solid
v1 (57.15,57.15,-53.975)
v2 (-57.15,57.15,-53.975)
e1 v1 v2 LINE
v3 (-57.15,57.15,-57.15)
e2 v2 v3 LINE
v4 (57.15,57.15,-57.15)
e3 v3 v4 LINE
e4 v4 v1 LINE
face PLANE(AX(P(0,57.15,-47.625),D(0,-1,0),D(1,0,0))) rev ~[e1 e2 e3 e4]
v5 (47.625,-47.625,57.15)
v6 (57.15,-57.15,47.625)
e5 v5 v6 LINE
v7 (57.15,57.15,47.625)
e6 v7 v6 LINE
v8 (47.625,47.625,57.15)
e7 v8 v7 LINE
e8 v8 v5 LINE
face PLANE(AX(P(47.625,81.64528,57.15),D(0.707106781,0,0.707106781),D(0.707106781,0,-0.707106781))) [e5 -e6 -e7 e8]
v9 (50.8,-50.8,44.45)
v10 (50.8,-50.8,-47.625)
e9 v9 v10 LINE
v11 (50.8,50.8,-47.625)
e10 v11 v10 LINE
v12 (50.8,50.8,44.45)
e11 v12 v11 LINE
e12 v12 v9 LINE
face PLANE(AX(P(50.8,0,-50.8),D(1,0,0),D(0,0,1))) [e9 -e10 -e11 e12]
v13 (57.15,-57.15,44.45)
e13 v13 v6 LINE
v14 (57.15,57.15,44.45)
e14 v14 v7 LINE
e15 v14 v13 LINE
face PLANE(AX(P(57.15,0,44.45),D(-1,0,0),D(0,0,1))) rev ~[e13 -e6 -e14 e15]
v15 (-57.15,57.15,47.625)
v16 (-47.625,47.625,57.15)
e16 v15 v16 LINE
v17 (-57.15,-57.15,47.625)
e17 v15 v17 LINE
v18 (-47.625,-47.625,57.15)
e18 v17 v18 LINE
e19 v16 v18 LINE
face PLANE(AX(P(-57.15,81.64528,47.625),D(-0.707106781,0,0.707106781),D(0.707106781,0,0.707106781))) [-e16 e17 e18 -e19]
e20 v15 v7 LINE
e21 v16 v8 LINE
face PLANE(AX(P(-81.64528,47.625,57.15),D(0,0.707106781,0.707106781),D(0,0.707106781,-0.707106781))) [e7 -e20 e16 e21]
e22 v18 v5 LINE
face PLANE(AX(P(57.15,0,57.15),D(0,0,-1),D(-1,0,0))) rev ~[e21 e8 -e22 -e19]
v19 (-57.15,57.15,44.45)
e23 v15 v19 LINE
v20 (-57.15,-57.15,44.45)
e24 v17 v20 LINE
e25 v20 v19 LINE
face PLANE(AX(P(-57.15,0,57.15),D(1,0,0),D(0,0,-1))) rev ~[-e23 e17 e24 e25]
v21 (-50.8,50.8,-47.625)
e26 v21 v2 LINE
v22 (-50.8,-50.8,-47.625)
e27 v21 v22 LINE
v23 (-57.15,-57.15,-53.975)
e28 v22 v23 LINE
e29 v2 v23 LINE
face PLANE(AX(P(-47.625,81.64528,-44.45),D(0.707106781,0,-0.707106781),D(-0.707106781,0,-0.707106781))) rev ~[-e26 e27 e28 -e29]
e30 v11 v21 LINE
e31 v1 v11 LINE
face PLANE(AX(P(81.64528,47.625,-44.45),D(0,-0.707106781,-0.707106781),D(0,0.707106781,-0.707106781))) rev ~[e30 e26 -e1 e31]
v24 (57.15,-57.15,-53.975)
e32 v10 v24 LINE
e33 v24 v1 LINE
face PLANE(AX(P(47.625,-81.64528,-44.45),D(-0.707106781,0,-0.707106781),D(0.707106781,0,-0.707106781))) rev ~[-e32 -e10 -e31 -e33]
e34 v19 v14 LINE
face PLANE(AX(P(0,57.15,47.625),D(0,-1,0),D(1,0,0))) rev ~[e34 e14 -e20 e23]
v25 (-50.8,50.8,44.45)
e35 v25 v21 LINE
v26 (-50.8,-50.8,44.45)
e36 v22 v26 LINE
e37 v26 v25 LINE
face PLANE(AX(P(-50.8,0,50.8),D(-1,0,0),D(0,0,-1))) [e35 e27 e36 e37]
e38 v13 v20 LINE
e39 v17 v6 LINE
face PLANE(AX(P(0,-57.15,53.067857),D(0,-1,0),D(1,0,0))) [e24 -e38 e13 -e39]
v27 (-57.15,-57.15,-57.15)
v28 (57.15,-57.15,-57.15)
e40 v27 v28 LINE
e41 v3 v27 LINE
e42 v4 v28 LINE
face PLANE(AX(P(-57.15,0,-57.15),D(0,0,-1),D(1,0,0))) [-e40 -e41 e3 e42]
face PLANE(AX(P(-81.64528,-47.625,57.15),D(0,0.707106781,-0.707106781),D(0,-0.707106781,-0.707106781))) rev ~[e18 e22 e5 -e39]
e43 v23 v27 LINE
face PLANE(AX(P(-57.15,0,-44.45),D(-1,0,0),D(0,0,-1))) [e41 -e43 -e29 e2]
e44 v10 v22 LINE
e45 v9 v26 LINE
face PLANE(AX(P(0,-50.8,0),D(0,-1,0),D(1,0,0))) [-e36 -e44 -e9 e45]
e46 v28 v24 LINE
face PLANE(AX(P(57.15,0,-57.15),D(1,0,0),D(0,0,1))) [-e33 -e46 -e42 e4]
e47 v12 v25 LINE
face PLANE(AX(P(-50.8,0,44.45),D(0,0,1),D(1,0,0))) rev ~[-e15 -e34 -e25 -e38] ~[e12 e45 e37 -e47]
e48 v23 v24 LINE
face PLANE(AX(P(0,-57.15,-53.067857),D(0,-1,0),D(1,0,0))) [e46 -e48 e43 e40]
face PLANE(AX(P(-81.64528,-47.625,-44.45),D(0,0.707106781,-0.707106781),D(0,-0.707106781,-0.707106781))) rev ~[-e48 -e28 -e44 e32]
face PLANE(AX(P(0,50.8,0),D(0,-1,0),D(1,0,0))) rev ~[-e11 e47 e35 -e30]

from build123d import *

# Parameters (mm, degrees)
F0_W          = 101.6
F0_H          = 6.35
F0_H_2        = 88.9
F1_DEPTH      = 50.8
F2_DEPTH      = 57.15
F3_DEPTH      = 57.15
F4_T1_DEPTH   = 163.2905609208
F4_T3_DEPTH   = 163.2905609208
F4_T8_DEPTH   = 163.2905609208
F4_T14_DEPTH  = 163.2905609208
F4_T20_DEPTH  = 163.2905609208
F4_T27_DEPTH  = 163.2905609208
F4_T33_DEPTH  = 163.2905609208
F4_T39_DEPTH  = 163.2905609208
F4_T45_DEPTH  = 163.2905609208
F4_T51_DEPTH  = 163.2905609208
F4_T58_DEPTH  = 163.2905609208
F4_T64_DEPTH  = 163.2905609208
F4_T70_DEPTH  = 163.2905609208
F4_T76_DEPTH  = 163.2905609208
F4_T82_DEPTH  = 163.2905609208
F4_T89_DEPTH  = 163.2905609208
F4_T95_DEPTH  = 163.2905609208
F4_T101_DEPTH = 163.2905609208
F4_T107_DEPTH = 163.2905609208
F4_T113_DEPTH = 163.2905609208
F4_T120_DEPTH = 163.2905609208
F4_T126_DEPTH = 163.2905609208


# Not quite as in the source:
# - a fillet or chamfer that OpenCascade refuses, or shapes differently, is made with other operations: its cross-section is extruded or revolved along the edge and cut away or added


with BuildPart() as f1:
    # F0 (on Front) → F1 (new body, symmetric)
    with BuildSketch(Plane.XZ):
        with Locations((0, -47.625)):
            Rectangle(F0_W, F0_H)
        Rectangle(F0_W, F0_H_2)
        with Locations((0, 47.625)):
            Rectangle(F0_W, F0_H)
    extrude(amount=F1_DEPTH, both=True)

    # F0 (on Front) → F2 (join, symmetric)
    with BuildSketch(Plane.XZ):
        Polygon((-50.8, 44.45), (-50.8, 50.8), (50.8, 50.8), (50.8, 44.45), (57.15, 44.45), (57.15, 57.15), (-57.15, 57.15), (-57.15, 44.45), align=None)
        Polygon((-50.8, -50.8), (-50.8, -44.45), (-57.15, -44.45), (-57.15, -57.15), (57.15, -57.15), (57.15, -44.45), (50.8, -44.45), (50.8, -50.8), align=None)
    extrude(amount=F2_DEPTH, both=True)

    # F0 (on Front) → F3 (join, symmetric)
    with BuildSketch(Plane.XZ):
        with Locations((0, 47.625)):
            Rectangle(F0_W, F0_H)
        with Locations((0, -47.625)):
            Rectangle(F0_W, F0_H)
    extrude(amount=F3_DEPTH, both=True)

    # F4: chamfer of 9.525 on 8 edges, made by hand

    # F4_s2 → F4_t1 (cut)
    with BuildSketch(Plane.YZ.offset(-81.6452804604)):
        Polygon((-47.625, 57.15), (-57.15, 47.625), (-57.15, 57.15), align=None)
        Polygon((47.625, 57.15), (57.15, 47.625), (57.15, 57.15), align=None)
    extrude(amount=F4_T1_DEPTH, mode=Mode.SUBTRACT)

    # F4_s4 → F4_t3 (cut)
    with BuildSketch(Plane.XZ.offset(-81.6452804604)):
        Polygon((47.625, 57.15), (57.15, 47.625), (57.15, 57.15), align=None)
        Polygon((-57.15, 47.625), (-47.625, 57.15), (-57.15, 57.15), align=None)
    extrude(amount=F4_T3_DEPTH, mode=Mode.SUBTRACT)


with BuildPart() as f4_tool6:
    # F4_s7 → F4_t8 (new body)
    with BuildSketch(Plane.XZ.offset(81.6452804604)):
        Polygon((47.625, -44.45), (57.15, -53.975), (57.15, -44.45), align=None)
    extrude(amount=-F4_T8_DEPTH)

    split(bisect_by=Plane.YZ.offset(50.8), keep=Keep.BOTTOM)

    split(bisect_by=Plane.XZ.offset(50.8), keep=Keep.TOP)


with BuildPart() as f1_1:
    add(f1.part)

    # F4_t5: cut F4_tool6
    add(f4_tool6.part, mode=Mode.SUBTRACT)


with BuildPart() as f4_tool12:
    # F4_s13 → F4_t14 (new body)
    with BuildSketch(Plane.XZ.offset(81.6452804604)):
        Polygon((47.625, -44.45), (57.15, -53.975), (57.15, -44.45), align=None)
    extrude(amount=-F4_T14_DEPTH)

    split(bisect_by=Plane.YZ.offset(50.8), keep=Keep.TOP)

    split(bisect_by=Plane.XZ.offset(50.8), keep=Keep.TOP)


with BuildPart() as f1_2:
    add(f1_1.part)

    # F4_t11: cut F4_tool12
    add(f4_tool12.part, mode=Mode.SUBTRACT)


with BuildPart() as f4_tool18:
    # F4_s19 → F4_t20 (new body)
    with BuildSketch(Plane.XZ.offset(81.6452804604)):
        Polygon((47.625, -44.45), (57.15, -53.975), (57.15, -44.45), align=None)
    extrude(amount=-F4_T20_DEPTH)

    split(bisect_by=Plane.XZ.offset(-50.8), keep=Keep.TOP)

    split(bisect_by=Plane.YZ.offset(50.8), keep=Keep.TOP)

    split(bisect_by=Plane.XZ.offset(50.8), keep=Keep.BOTTOM)


with BuildPart() as f1_3:
    add(f1_2.part)

    # F4_t17: cut F4_tool18
    add(f4_tool18.part, mode=Mode.SUBTRACT)


with BuildPart() as f4_tool25:
    # F4_s26 → F4_t27 (new body)
    with BuildSketch(Plane.XZ.offset(81.6452804604)):
        Polygon((47.625, -44.45), (57.15, -53.975), (57.15, -44.45), align=None)
    extrude(amount=-F4_T27_DEPTH)

    split(bisect_by=Plane.XZ.offset(-50.8), keep=Keep.BOTTOM)

    split(bisect_by=Plane.YZ.offset(50.8), keep=Keep.BOTTOM)


with BuildPart() as f1_4:
    add(f1_3.part)

    # F4_t24: cut F4_tool25
    add(f4_tool25.part, mode=Mode.SUBTRACT)


with BuildPart() as f4_tool31:
    # F4_s32 → F4_t33 (new body)
    with BuildSketch(Plane.XZ.offset(81.6452804604)):
        Polygon((47.625, -44.45), (57.15, -53.975), (57.15, -44.45), align=None)
    extrude(amount=-F4_T33_DEPTH)

    split(bisect_by=Plane.XZ.offset(-50.8), keep=Keep.BOTTOM)

    split(bisect_by=Plane.YZ.offset(50.8), keep=Keep.TOP)


with BuildPart() as f1_5:
    add(f1_4.part)

    # F4_t30: cut F4_tool31
    add(f4_tool31.part, mode=Mode.SUBTRACT)


with BuildPart() as f4_tool37:
    # F4_s38 → F4_t39 (new body)
    with BuildSketch(Plane.YZ.offset(-81.6452804604)):
        Polygon((-47.625, -44.45), (-57.15, -53.975), (-57.15, -44.45), align=None)
    extrude(amount=F4_T39_DEPTH)

    split(bisect_by=Plane.YZ.offset(-50.8), keep=Keep.BOTTOM)

    split(bisect_by=Plane.XZ.offset(50.8), keep=Keep.BOTTOM)


with BuildPart() as f1_6:
    add(f1_5.part)

    # F4_t36: cut F4_tool37
    add(f4_tool37.part, mode=Mode.SUBTRACT)


with BuildPart() as f4_tool43:
    # F4_s44 → F4_t45 (new body)
    with BuildSketch(Plane.YZ.offset(-81.6452804604)):
        Polygon((-47.625, -44.45), (-57.15, -53.975), (-57.15, -44.45), align=None)
    extrude(amount=F4_T45_DEPTH)

    split(bisect_by=Plane.YZ.offset(-50.8), keep=Keep.BOTTOM)

    split(bisect_by=Plane.XZ.offset(50.8), keep=Keep.TOP)


with BuildPart() as f1_7:
    add(f1_6.part)

    # F4_t42: cut F4_tool43
    add(f4_tool43.part, mode=Mode.SUBTRACT)


with BuildPart() as f4_tool49:
    # F4_s50 → F4_t51 (new body)
    with BuildSketch(Plane.YZ.offset(-81.6452804604)):
        Polygon((-47.625, -44.45), (-57.15, -53.975), (-57.15, -44.45), align=None)
    extrude(amount=F4_T51_DEPTH)

    split(bisect_by=Plane.YZ.offset(-50.8), keep=Keep.TOP)

    split(bisect_by=Plane.YZ.offset(50.8), keep=Keep.BOTTOM)

    split(bisect_by=Plane.XZ.offset(50.8), keep=Keep.TOP)


with BuildPart() as f1_8:
    add(f1_7.part)

    # F4_t48: cut F4_tool49
    add(f4_tool49.part, mode=Mode.SUBTRACT)


with BuildPart() as f4_tool56:
    # F4_s57 → F4_t58 (new body)
    with BuildSketch(Plane.YZ.offset(-81.6452804604)):
        Polygon((-47.625, -44.45), (-57.15, -53.975), (-57.15, -44.45), align=None)
    extrude(amount=F4_T58_DEPTH)

    split(bisect_by=Plane.YZ.offset(50.8), keep=Keep.TOP)

    split(bisect_by=Plane.XZ.offset(50.8), keep=Keep.BOTTOM)


with BuildPart() as f1_9:
    add(f1_8.part)

    # F4_t55: cut F4_tool56
    add(f4_tool56.part, mode=Mode.SUBTRACT)


with BuildPart() as f4_tool62:
    # F4_s63 → F4_t64 (new body)
    with BuildSketch(Plane.YZ.offset(-81.6452804604)):
        Polygon((-47.625, -44.45), (-57.15, -53.975), (-57.15, -44.45), align=None)
    extrude(amount=F4_T64_DEPTH)

    split(bisect_by=Plane.YZ.offset(50.8), keep=Keep.TOP)

    split(bisect_by=Plane.XZ.offset(50.8), keep=Keep.TOP)


with BuildPart() as f1_10:
    add(f1_9.part)

    # F4_t61: cut F4_tool62
    add(f4_tool62.part, mode=Mode.SUBTRACT)


with BuildPart() as f4_tool68:
    # F4_s69 → F4_t70 (new body)
    with BuildSketch(Plane.XZ.offset(-81.6452804604)):
        Polygon((-47.625, -44.45), (-57.15, -53.975), (-57.15, -44.45), align=None)
    extrude(amount=F4_T70_DEPTH)

    split(bisect_by=Plane.YZ.offset(-50.8), keep=Keep.TOP)

    split(bisect_by=Plane.XZ.offset(-50.8), keep=Keep.BOTTOM)


with BuildPart() as f1_11:
    add(f1_10.part)

    # F4_t67: cut F4_tool68
    add(f4_tool68.part, mode=Mode.SUBTRACT)


with BuildPart() as f4_tool74:
    # F4_s75 → F4_t76 (new body)
    with BuildSketch(Plane.XZ.offset(-81.6452804604)):
        Polygon((-47.625, -44.45), (-57.15, -53.975), (-57.15, -44.45), align=None)
    extrude(amount=F4_T76_DEPTH)

    split(bisect_by=Plane.YZ.offset(-50.8), keep=Keep.BOTTOM)

    split(bisect_by=Plane.XZ.offset(-50.8), keep=Keep.BOTTOM)


with BuildPart() as f1_12:
    add(f1_11.part)

    # F4_t73: cut F4_tool74
    add(f4_tool74.part, mode=Mode.SUBTRACT)


with BuildPart() as f4_tool80:
    # F4_s81 → F4_t82 (new body)
    with BuildSketch(Plane.XZ.offset(-81.6452804604)):
        Polygon((-47.625, -44.45), (-57.15, -53.975), (-57.15, -44.45), align=None)
    extrude(amount=F4_T82_DEPTH)

    split(bisect_by=Plane.YZ.offset(-50.8), keep=Keep.BOTTOM)

    split(bisect_by=Plane.XZ.offset(-50.8), keep=Keep.TOP)

    split(bisect_by=Plane.XZ.offset(50.8), keep=Keep.BOTTOM)


with BuildPart() as f1_13:
    add(f1_12.part)

    # F4_t79: cut F4_tool80
    add(f4_tool80.part, mode=Mode.SUBTRACT)


with BuildPart() as f4_tool87:
    # F4_s88 → F4_t89 (new body)
    with BuildSketch(Plane.XZ.offset(-81.6452804604)):
        Polygon((-47.625, -44.45), (-57.15, -53.975), (-57.15, -44.45), align=None)
    extrude(amount=F4_T89_DEPTH)

    split(bisect_by=Plane.YZ.offset(-50.8), keep=Keep.TOP)

    split(bisect_by=Plane.XZ.offset(50.8), keep=Keep.TOP)


with BuildPart() as f1_14:
    add(f1_13.part)

    # F4_t86: cut F4_tool87
    add(f4_tool87.part, mode=Mode.SUBTRACT)


with BuildPart() as f4_tool93:
    # F4_s94 → F4_t95 (new body)
    with BuildSketch(Plane.XZ.offset(-81.6452804604)):
        Polygon((-47.625, -44.45), (-57.15, -53.975), (-57.15, -44.45), align=None)
    extrude(amount=F4_T95_DEPTH)

    split(bisect_by=Plane.YZ.offset(-50.8), keep=Keep.BOTTOM)

    split(bisect_by=Plane.XZ.offset(50.8), keep=Keep.TOP)


with BuildPart() as f1_15:
    add(f1_14.part)

    # F4_t92: cut F4_tool93
    add(f4_tool93.part, mode=Mode.SUBTRACT)


with BuildPart() as f4_tool99:
    # F4_s100 → F4_t101 (new body)
    with BuildSketch(Plane.YZ.offset(81.6452804604)):
        Polygon((47.625, -44.45), (57.15, -53.975), (57.15, -44.45), align=None)
    extrude(amount=-F4_T101_DEPTH)

    split(bisect_by=Plane.XZ.offset(-50.8), keep=Keep.TOP)

    split(bisect_by=Plane.YZ.offset(50.8), keep=Keep.TOP)


with BuildPart() as f1_16:
    add(f1_15.part)

    # F4_t98: cut F4_tool99
    add(f4_tool99.part, mode=Mode.SUBTRACT)


with BuildPart() as f4_tool105:
    # F4_s106 → F4_t107 (new body)
    with BuildSketch(Plane.YZ.offset(81.6452804604)):
        Polygon((47.625, -44.45), (57.15, -53.975), (57.15, -44.45), align=None)
    extrude(amount=-F4_T107_DEPTH)

    split(bisect_by=Plane.XZ.offset(-50.8), keep=Keep.BOTTOM)

    split(bisect_by=Plane.YZ.offset(50.8), keep=Keep.TOP)


with BuildPart() as f1_17:
    add(f1_16.part)

    # F4_t104: cut F4_tool105
    add(f4_tool105.part, mode=Mode.SUBTRACT)


with BuildPart() as f4_tool111:
    # F4_s112 → F4_t113 (new body)
    with BuildSketch(Plane.YZ.offset(81.6452804604)):
        Polygon((47.625, -44.45), (57.15, -53.975), (57.15, -44.45), align=None)
    extrude(amount=-F4_T113_DEPTH)

    split(bisect_by=Plane.YZ.offset(-50.8), keep=Keep.TOP)

    split(bisect_by=Plane.XZ.offset(-50.8), keep=Keep.BOTTOM)

    split(bisect_by=Plane.YZ.offset(50.8), keep=Keep.BOTTOM)


with BuildPart() as f1_18:
    add(f1_17.part)

    # F4_t110: cut F4_tool111
    add(f4_tool111.part, mode=Mode.SUBTRACT)


with BuildPart() as f4_tool118:
    # F4_s119 → F4_t120 (new body)
    with BuildSketch(Plane.YZ.offset(81.6452804604)):
        Polygon((47.625, -44.45), (57.15, -53.975), (57.15, -44.45), align=None)
    extrude(amount=-F4_T120_DEPTH)

    split(bisect_by=Plane.YZ.offset(-50.8), keep=Keep.BOTTOM)

    split(bisect_by=Plane.XZ.offset(-50.8), keep=Keep.TOP)


with BuildPart() as f1_19:
    add(f1_18.part)

    # F4_t117: cut F4_tool118
    add(f4_tool118.part, mode=Mode.SUBTRACT)


with BuildPart() as f4_tool124:
    # F4_s125 → F4_t126 (new body)
    with BuildSketch(Plane.YZ.offset(81.6452804604)):
        Polygon((47.625, -44.45), (57.15, -53.975), (57.15, -44.45), align=None)
    extrude(amount=-F4_T126_DEPTH)

    split(bisect_by=Plane.YZ.offset(-50.8), keep=Keep.BOTTOM)

    split(bisect_by=Plane.XZ.offset(-50.8), keep=Keep.BOTTOM)


with BuildPart() as f1_20:
    add(f1_19.part)

    # F4_t123: cut F4_tool124
    add(f4_tool124.part, mode=Mode.SUBTRACT)


solid = f1_20.part
